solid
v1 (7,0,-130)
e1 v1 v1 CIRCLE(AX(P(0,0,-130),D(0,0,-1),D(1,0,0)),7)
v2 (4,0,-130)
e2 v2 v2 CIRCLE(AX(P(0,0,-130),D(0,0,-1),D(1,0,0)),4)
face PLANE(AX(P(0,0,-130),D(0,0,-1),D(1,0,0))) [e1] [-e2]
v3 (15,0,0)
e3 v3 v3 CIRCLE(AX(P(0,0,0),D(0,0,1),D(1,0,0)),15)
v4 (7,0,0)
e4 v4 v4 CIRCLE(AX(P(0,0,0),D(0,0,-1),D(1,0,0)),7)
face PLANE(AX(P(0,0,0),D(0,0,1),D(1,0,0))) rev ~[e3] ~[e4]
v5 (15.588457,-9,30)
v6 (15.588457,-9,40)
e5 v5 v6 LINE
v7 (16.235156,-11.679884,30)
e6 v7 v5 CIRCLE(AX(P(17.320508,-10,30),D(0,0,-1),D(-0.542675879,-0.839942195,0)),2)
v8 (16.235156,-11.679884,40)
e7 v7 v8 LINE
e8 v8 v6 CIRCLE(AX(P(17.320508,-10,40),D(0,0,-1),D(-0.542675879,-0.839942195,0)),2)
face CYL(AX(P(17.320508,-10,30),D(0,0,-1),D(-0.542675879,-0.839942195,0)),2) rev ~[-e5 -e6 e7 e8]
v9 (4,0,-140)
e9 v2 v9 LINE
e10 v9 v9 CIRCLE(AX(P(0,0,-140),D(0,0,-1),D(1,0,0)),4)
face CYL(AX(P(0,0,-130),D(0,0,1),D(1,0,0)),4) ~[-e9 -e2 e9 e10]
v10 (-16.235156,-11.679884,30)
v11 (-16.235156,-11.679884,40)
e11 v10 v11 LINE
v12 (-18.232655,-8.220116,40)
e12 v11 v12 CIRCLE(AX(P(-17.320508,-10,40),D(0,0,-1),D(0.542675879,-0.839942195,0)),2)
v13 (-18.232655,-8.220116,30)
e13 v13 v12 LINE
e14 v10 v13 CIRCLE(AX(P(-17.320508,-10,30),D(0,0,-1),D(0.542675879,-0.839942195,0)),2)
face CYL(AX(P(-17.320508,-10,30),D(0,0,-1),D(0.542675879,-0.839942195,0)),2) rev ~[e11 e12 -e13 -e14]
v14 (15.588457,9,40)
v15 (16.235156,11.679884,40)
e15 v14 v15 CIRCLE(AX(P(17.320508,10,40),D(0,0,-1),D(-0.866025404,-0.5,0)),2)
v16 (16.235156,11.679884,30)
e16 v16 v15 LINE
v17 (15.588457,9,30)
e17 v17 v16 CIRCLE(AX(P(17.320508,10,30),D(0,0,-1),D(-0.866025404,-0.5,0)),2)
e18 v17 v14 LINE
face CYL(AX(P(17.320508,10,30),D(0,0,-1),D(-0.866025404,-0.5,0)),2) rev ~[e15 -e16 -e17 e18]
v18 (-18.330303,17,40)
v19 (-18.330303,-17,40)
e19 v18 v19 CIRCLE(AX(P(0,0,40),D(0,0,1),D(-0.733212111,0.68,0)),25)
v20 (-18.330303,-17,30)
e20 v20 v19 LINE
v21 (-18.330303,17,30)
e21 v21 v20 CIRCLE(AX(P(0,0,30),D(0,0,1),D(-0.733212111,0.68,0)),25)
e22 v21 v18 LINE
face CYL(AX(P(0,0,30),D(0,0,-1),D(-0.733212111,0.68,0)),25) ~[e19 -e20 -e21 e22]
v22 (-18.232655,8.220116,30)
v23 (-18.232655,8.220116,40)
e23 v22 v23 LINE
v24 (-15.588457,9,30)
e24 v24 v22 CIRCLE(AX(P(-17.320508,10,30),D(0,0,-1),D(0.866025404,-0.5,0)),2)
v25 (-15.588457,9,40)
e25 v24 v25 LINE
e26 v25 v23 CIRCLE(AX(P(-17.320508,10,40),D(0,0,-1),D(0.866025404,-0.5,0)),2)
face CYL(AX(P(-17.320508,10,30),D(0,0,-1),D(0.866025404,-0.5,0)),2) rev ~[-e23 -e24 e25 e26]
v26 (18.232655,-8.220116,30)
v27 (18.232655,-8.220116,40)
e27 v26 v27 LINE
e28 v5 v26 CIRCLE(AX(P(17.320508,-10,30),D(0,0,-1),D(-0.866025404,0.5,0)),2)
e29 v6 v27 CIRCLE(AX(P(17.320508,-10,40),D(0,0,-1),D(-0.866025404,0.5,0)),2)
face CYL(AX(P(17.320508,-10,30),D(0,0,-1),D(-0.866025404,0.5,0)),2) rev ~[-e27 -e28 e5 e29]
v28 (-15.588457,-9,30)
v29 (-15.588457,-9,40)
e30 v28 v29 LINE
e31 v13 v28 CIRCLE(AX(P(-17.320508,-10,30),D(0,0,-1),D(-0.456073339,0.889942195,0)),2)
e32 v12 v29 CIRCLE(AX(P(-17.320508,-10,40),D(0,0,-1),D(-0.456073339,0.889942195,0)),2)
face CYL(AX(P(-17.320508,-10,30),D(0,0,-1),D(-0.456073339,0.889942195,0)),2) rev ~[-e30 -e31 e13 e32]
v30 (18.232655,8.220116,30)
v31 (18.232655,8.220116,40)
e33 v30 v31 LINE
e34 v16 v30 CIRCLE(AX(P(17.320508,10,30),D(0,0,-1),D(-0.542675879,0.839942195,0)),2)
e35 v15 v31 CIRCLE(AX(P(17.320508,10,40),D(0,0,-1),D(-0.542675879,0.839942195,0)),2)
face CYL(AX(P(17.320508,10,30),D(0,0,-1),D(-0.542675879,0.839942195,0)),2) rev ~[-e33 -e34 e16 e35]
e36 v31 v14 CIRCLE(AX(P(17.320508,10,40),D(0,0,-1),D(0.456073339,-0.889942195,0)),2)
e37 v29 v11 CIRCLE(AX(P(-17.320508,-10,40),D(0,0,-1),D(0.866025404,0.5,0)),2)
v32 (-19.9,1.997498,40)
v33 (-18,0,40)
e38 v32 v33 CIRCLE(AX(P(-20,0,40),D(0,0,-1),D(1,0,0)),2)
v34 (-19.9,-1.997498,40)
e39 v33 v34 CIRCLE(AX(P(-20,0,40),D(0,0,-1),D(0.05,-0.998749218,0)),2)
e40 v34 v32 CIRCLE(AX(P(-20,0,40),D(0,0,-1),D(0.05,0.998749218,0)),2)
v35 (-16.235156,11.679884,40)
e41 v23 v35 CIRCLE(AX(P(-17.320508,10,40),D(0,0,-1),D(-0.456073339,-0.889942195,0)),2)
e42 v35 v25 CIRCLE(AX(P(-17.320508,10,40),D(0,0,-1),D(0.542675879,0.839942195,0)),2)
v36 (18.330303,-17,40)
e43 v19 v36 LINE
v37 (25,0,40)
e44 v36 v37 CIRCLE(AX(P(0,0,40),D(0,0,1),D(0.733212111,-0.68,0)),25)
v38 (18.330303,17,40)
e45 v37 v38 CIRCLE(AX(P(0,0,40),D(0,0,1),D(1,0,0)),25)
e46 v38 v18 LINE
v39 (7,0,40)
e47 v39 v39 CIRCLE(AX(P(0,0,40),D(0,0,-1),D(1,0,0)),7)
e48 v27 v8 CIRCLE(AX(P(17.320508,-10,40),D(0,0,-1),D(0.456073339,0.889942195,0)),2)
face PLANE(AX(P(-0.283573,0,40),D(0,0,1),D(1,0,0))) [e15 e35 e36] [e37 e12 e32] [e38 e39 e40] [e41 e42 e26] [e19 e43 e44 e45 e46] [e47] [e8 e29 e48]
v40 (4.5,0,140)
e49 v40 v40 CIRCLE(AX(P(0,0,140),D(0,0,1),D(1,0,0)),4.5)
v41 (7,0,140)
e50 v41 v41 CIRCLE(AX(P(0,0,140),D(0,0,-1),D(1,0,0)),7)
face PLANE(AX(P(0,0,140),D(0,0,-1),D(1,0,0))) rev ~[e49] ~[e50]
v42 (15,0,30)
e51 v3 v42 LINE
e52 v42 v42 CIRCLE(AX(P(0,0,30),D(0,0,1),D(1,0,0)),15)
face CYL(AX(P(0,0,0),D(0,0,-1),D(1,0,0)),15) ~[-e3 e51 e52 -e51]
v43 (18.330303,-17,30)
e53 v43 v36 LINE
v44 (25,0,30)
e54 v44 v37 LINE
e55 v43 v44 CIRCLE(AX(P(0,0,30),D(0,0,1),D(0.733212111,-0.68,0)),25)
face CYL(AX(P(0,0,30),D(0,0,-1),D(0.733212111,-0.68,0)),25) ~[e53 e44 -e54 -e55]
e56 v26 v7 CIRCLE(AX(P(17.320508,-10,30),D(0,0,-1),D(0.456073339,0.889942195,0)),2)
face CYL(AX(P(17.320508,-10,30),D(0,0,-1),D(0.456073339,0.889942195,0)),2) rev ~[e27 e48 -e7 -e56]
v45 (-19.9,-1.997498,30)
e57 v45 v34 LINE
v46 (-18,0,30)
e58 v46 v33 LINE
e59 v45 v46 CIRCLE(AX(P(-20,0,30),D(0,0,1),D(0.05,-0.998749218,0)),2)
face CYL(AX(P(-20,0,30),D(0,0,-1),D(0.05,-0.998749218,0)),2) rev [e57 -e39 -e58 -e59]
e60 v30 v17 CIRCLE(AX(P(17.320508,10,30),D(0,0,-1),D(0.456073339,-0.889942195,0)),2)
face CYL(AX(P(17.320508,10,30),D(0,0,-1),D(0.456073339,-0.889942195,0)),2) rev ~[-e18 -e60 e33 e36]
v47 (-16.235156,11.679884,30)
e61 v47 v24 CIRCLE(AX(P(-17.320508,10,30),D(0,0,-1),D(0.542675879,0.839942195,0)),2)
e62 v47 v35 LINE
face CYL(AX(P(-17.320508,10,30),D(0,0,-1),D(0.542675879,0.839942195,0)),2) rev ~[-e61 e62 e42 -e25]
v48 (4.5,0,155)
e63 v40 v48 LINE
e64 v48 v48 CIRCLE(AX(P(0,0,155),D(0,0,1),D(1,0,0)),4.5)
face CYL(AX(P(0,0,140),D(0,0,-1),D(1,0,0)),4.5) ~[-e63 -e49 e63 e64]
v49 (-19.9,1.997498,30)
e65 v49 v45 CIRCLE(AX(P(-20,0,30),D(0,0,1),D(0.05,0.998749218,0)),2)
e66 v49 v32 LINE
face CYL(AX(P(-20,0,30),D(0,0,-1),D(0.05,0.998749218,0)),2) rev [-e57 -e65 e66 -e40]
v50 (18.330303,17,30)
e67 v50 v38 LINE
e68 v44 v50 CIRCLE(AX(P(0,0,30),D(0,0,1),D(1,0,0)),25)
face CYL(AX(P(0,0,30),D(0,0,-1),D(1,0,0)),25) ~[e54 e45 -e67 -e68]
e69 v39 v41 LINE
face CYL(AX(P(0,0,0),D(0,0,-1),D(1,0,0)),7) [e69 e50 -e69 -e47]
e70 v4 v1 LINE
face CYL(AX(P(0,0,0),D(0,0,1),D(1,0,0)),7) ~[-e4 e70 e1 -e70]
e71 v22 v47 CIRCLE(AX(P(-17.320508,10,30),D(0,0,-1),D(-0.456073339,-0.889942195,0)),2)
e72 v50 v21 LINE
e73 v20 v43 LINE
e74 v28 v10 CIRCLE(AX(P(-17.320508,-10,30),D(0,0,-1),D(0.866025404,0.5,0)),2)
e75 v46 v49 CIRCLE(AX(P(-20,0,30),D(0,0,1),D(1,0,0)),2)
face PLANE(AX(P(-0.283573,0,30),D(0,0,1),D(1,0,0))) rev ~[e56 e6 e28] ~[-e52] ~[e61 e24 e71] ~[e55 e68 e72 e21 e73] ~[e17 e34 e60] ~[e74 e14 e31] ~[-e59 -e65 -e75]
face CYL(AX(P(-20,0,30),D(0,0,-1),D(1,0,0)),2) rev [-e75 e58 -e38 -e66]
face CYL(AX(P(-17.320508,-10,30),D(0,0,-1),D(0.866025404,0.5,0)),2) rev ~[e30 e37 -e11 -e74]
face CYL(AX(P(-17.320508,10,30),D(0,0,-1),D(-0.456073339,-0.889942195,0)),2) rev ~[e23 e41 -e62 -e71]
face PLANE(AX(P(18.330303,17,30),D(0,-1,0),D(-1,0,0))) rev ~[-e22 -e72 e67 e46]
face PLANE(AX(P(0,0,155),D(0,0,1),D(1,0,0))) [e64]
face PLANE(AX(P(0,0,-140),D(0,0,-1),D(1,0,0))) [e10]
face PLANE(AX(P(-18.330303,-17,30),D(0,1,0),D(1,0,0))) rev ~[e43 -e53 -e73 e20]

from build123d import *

# Parameters (mm, degrees)
F0_R          = 15
F1_DEPTH      = 30
F2_R          = 15
F3_DEPTH      = 10
F4_DEPTH      = 25
F6_R          = 7
F7_DEPTH      = 130
F7_DEPTH_BACK = 140
F8_R          = 4
F9_DEPTH      = 10
F10_R         = 4.5
F11_DEPTH     = 15


# Not quite as in the source:
# - a pattern or mirror of a feature is missing from the dataset's text; its kind, count and spacing are read off the source's solid


with BuildPart() as f1:
    # F0 (on Top) → F1 (new body)
    with BuildSketch(Plane.XY):
        Circle(F0_R)
    extrude(amount=F1_DEPTH)

    # F2 (on face) → F3 (join)
    with BuildSketch(Plane.XY.offset(30)):
        with BuildLine():
            ThreePointArc((10.5356537529, -17), (17.4744538549, -9.7284871625), (20, 0))
            ThreePointArc((20, 0), (17.4744538549, 9.7284871625), (10.5356537529, 17))
            Line((10.5356537529, 17), (-10.5356537529, 17))
            ThreePointArc((-10.5356537529, 17), (-16.9661727605, 10.5900416364), (-19.9, 1.9974984355))
            ThreePointArc((-19.9, 1.9974984355), (-18.5508623254, 1.3784048752), (-18, 0))
            ThreePointArc((-18, 0), (-18.5508623254, -1.3784048752), (-19.9, -1.9974984355))
            ThreePointArc((-19.9, -1.9974984355), (-16.9661727605, -10.5900416364), (-10.5356537529, -17))
            Line((-10.5356537529, -17), (10.5356537529, -17))
        make_face()
        Circle(F2_R, mode=Mode.SUBTRACT)
        with BuildLine():
            ThreePointArc((10.5356537529, 17), (17.4744538549, 9.7284871625), (20, 0))
            ThreePointArc((20, 0), (17.4744538549, -9.7284871625), (10.5356537529, -17))
            Line((10.5356537529, -17), (18.3303027798, -17))
            ThreePointArc((18.3303027798, -17), (23.2729195579, -9.1307839342), (25, 0))
            ThreePointArc((25, 0), (23.2729195579, 9.1307839342), (18.3303027798, 17))
            Line((18.3303027798, 17), (10.5356537529, 17))
        make_face()
        with BuildLine():
            ThreePointArc((-19.9, 1.9974984355), (-16.9661727605, 10.5900416364), (-10.5356537529, 17))
            Line((-10.5356537529, 17), (-18.3303027798, 17))
            ThreePointArc((-18.3303027798, 17), (-25, 0), (-18.3303027798, -17))
            Line((-18.3303027798, -17), (-10.5356537529, -17))
            ThreePointArc((-10.5356537529, -17), (-16.9661727605, -10.5900416364), (-19.9, -1.9974984355))
            ThreePointArc((-19.9, -1.9974984355), (-22, 0), (-19.9, 1.9974984355))
        make_face()
        with BuildLine():
            ThreePointArc((-18, 0), (-18.5508623254, 1.3784048752), (-19.9, 1.9974984355))
            ThreePointArc((-19.9, 1.9974984355), (-20, 0), (-19.9, -1.9974984355))
            ThreePointArc((-19.9, -1.9974984355), (-18.5508623254, -1.3784048752), (-18, 0))
        make_face()
        with BuildLine():
            ThreePointArc((-19.9, -1.9974984355), (-20, 0), (-19.9, 1.9974984355))
            ThreePointArc((-19.9, 1.9974984355), (-22, 0), (-19.9, -1.9974984355))
        make_face()
        Circle(F2_R)
    extrude(amount=F3_DEPTH)

    # F2 (on face) → F4 (cut)
    with BuildSketch(Plane.XY.offset(30)):
        with BuildLine():
            ThreePointArc((-18, 0), (-18.5508623254, 1.3784048752), (-19.9, 1.9974984355))
            ThreePointArc((-19.9, 1.9974984355), (-20, 0), (-19.9, -1.9974984355))
            ThreePointArc((-19.9, -1.9974984355), (-18.5508623254, -1.3784048752), (-18, 0))
        make_face()
        with BuildLine():
            ThreePointArc((-19.9, -1.9974984355), (-20, 0), (-19.9, 1.9974984355))
            ThreePointArc((-19.9, 1.9974984355), (-22, 0), (-19.9, -1.9974984355))
        make_face()
    f4 = extrude(amount=F4_DEPTH, mode=Mode.SUBTRACT)

    # F4_copies: F4 across plane
    add(f4.mirror(Plane(origin=(0, 0, 0), x_dir=(-0.9659258263, -0.2588190451, 0), z_dir=(0.2588190451, -0.9659258263, 0))), mode=Mode.SUBTRACT)

    # F4_copies1: F4 across plane
    add(f4.mirror(Plane(origin=(0, 0, 0), x_dir=(0.9659258263, -0.2588190451, 0), z_dir=(0.2588190451, 0.9659258263, 0))), mode=Mode.SUBTRACT)

    # F4_copies2: F4 across plane
    add(f4.mirror(Plane(origin=(0, 0, 0), x_dir=(0.2588190451, 0.9659258263, 0), z_dir=(0.9659258263, -0.2588190451, 0))), mode=Mode.SUBTRACT)

    # F4_copies3: F4 across plane
    add(f4.mirror(Plane(origin=(0, 0, 0), x_dir=(-0.2588190451, 0.9659258263, 0), z_dir=(0.9659258263, 0.2588190451, 0))), mode=Mode.SUBTRACT)

    # F6 (on face) → F7 (join, two sides)
    with BuildSketch(Plane(origin=(0, 0, 0), x_dir=(1, 0, 0), z_dir=(0, 0, -1))) as f7_sk:
        Circle(F6_R)
    extrude(amount=F7_DEPTH)
    extrude(f7_sk.sketch, amount=-F7_DEPTH_BACK)

    # F8 (on face) → F9 (join)
    with BuildSketch(Plane(origin=(0, 0, -130), x_dir=(1, 0, 0), z_dir=(0, 0, -1))):
        Circle(F8_R)
    extrude(amount=F9_DEPTH)

    # F10 (on face) → F11 (join)
    with BuildSketch(Plane.XY.offset(140)):
        Circle(F10_R)
    extrude(amount=F11_DEPTH)


solid = f1.part
